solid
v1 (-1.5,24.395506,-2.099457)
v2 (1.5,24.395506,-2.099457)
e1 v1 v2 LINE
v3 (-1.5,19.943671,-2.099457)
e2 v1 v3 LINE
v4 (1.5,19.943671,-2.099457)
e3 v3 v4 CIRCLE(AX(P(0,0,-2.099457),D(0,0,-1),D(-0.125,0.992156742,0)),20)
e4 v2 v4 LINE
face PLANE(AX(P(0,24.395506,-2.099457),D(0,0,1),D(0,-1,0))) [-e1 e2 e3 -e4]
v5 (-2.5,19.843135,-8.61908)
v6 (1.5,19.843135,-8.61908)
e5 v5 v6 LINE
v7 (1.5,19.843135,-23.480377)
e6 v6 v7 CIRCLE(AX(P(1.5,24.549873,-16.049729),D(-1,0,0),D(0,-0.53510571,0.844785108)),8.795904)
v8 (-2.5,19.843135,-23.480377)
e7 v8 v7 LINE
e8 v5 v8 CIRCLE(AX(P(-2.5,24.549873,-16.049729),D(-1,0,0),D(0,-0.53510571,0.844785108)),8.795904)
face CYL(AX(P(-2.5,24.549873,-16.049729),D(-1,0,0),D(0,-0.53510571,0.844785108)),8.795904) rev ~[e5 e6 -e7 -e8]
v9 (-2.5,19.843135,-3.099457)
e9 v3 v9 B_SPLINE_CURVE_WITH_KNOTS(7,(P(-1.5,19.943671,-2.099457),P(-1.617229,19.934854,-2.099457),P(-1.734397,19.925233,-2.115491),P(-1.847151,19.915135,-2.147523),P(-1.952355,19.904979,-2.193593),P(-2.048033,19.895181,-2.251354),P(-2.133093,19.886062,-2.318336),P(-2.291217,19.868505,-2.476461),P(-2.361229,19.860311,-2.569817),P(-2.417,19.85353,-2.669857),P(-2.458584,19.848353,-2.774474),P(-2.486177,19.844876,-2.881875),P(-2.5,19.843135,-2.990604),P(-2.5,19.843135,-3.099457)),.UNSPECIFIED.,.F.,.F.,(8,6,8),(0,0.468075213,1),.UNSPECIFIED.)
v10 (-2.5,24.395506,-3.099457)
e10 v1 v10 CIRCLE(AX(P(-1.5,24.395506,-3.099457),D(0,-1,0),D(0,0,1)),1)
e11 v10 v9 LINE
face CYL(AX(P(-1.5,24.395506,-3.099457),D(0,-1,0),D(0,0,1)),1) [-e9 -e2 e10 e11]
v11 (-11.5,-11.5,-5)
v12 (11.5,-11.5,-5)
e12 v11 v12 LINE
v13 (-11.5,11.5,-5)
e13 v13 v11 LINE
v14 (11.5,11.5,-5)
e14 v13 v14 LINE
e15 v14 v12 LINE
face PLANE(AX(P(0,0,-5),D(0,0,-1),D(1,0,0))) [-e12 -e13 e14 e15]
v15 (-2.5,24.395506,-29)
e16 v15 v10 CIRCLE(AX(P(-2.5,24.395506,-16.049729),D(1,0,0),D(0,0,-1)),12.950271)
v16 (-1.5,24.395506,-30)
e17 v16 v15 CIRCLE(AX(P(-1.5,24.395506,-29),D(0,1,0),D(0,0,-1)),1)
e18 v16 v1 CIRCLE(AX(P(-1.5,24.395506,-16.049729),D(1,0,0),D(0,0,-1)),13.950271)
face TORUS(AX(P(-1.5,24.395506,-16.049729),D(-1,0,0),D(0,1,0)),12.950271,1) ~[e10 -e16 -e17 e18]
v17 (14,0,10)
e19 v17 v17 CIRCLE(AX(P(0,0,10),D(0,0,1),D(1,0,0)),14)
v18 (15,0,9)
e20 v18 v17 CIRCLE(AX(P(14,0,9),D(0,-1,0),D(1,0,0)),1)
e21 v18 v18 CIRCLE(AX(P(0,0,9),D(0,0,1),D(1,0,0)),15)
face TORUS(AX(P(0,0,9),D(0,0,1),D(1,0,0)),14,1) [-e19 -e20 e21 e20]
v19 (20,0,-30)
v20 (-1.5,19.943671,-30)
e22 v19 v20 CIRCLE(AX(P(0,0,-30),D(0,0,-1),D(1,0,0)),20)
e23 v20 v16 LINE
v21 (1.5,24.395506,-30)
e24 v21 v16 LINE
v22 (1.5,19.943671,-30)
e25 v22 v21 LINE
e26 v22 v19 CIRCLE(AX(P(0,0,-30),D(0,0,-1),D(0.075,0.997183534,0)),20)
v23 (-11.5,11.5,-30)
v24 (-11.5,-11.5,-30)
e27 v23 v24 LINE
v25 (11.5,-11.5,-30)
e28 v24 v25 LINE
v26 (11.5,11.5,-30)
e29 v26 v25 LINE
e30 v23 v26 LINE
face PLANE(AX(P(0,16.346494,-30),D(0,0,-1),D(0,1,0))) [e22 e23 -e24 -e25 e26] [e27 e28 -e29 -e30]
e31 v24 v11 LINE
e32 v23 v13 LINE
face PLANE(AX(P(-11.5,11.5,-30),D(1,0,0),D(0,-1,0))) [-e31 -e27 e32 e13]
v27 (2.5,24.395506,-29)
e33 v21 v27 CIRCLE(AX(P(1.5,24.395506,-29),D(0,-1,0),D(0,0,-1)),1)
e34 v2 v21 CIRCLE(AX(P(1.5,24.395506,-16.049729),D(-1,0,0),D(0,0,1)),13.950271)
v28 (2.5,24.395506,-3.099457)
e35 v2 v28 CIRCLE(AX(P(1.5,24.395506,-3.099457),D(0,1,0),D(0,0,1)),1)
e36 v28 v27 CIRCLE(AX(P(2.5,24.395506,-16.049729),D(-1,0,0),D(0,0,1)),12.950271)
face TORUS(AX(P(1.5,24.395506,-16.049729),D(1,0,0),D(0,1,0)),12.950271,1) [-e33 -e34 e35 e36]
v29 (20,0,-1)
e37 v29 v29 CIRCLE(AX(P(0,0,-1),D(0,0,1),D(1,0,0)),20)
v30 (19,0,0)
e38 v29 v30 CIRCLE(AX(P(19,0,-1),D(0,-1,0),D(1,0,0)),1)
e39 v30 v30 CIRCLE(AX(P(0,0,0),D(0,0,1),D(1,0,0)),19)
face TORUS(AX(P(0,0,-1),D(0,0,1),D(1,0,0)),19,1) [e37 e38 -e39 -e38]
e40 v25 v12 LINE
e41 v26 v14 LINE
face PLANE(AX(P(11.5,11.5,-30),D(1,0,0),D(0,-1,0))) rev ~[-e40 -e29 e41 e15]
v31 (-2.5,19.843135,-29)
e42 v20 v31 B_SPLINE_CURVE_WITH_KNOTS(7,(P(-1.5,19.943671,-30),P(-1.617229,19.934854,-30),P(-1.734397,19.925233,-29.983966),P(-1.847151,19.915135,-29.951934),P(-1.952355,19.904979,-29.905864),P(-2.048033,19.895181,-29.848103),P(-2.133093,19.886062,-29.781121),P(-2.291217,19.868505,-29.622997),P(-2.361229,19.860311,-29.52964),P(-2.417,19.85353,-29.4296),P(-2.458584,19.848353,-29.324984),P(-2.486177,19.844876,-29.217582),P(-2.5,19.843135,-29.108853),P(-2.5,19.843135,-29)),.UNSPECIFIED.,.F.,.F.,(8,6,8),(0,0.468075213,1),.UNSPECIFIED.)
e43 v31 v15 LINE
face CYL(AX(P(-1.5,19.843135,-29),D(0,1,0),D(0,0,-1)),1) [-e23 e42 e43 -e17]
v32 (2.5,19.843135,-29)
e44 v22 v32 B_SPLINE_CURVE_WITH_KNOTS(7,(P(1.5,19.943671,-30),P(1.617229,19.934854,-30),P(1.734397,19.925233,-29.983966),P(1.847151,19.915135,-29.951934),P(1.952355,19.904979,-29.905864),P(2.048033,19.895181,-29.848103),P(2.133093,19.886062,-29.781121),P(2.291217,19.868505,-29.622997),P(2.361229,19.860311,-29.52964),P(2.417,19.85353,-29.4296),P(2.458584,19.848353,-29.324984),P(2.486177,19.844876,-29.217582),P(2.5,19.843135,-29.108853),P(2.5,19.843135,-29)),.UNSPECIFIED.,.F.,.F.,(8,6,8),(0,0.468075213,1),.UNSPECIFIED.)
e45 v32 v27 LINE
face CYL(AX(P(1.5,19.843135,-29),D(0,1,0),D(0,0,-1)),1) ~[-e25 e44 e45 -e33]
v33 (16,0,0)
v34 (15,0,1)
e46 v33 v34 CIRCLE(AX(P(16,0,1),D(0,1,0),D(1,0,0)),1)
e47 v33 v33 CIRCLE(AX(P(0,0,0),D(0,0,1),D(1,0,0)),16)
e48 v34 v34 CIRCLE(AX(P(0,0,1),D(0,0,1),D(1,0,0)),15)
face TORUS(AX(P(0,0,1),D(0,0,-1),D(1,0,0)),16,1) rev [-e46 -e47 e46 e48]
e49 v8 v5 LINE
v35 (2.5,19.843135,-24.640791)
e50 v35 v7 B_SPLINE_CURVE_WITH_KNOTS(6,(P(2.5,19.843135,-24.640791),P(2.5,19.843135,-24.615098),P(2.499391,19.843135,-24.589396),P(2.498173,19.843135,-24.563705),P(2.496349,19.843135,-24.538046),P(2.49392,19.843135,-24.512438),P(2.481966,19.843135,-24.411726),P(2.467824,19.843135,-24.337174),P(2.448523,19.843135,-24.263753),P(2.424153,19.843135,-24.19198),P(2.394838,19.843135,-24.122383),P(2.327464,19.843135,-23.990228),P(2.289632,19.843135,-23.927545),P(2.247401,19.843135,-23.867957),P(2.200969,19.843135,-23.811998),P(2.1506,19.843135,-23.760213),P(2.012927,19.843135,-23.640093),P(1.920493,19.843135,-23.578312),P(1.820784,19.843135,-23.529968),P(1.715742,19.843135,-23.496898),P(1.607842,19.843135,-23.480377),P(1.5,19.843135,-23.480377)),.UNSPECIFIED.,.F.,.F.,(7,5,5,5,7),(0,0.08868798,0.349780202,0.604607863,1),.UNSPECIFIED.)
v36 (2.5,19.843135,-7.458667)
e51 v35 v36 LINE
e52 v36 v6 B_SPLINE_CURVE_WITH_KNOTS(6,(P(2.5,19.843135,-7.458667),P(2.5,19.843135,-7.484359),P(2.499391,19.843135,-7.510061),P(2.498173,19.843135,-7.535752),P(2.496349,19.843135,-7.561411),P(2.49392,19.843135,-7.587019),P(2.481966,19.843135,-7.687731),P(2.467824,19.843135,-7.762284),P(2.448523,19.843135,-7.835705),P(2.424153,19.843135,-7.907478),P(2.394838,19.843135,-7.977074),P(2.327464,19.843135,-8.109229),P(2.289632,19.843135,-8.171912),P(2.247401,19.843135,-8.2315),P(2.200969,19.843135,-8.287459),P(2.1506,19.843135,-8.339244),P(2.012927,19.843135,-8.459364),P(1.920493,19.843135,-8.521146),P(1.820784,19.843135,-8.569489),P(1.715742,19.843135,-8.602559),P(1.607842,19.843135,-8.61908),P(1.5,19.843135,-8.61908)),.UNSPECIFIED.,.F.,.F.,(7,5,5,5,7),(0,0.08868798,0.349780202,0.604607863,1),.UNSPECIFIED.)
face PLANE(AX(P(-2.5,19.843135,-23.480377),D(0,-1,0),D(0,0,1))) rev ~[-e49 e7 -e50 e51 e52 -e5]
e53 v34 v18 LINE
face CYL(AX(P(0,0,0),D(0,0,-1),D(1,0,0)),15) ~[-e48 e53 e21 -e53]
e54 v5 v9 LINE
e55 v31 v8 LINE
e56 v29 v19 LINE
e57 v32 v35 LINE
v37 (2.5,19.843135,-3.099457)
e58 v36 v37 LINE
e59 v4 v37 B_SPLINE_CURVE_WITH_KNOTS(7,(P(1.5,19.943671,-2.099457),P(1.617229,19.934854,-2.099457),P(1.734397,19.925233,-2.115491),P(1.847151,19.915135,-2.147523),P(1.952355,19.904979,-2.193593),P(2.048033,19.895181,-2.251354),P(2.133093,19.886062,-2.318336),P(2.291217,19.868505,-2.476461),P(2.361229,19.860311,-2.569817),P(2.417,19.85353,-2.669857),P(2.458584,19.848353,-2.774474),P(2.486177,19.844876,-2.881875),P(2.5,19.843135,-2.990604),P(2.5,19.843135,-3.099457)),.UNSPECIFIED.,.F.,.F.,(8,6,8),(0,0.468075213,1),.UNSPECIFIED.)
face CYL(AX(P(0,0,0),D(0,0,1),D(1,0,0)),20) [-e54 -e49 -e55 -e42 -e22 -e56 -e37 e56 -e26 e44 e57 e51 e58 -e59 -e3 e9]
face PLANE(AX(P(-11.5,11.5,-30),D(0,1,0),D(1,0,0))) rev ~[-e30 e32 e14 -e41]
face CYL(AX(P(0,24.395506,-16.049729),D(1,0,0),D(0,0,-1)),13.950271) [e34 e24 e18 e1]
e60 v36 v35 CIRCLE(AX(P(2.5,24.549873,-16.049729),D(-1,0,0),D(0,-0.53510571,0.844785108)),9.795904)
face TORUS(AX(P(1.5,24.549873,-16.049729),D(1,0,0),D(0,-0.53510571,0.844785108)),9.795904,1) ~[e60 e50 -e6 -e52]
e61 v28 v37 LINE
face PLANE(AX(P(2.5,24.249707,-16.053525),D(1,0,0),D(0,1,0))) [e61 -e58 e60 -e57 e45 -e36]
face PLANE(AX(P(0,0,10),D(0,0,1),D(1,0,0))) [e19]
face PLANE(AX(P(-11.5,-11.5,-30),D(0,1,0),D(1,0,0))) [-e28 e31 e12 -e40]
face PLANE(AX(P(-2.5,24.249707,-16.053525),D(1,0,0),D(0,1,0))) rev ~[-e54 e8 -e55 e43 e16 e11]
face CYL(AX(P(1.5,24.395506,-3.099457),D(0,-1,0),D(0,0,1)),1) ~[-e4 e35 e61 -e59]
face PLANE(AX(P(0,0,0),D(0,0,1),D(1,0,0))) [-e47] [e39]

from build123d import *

# Parameters (mm, degrees)
F0_R          = 15
F1_DEPTH      = 10
F2_R          = 20
F3_DEPTH      = 30
F5_DEPTH      = 2.5
F5_DEPTH_BACK = 2.5
F7_DEPTH      = 25
F8_W          = 23
F8_H          = 23
F9_DEPTH      = 25
F10_R         = 1


with BuildPart() as f1:
    # F0 (on Top) → F1 (new body)
    with BuildSketch(Plane.XY):
        Circle(F0_R)
    extrude(amount=F1_DEPTH)

    # F2 (on Top) → F3 (join)
    with BuildSketch(Plane.XY):
        Circle(F2_R)
    extrude(amount=-F3_DEPTH)

    # F4 (on Right) → F5 (join, two sides)
    with BuildSketch(Plane.YZ) as f5_sk:
        with BuildLine():
            ThreePointArc((24.3955058538, -30), (34.2598373067, -25.9140601285), (38.3457771782, -16.0497286756))
            ThreePointArc((38.3457771782, -16.0497286756), (34.2598373067, -6.1853972226), (24.3955058538, -2.0994573511))
            Line((24.3955058538, -2.0994573511), (17.0112717897, -7.5845918618))
            Line((17.0112717897, -7.5845918618), (15.4388935224, -5.3544416027))
            ThreePointArc((15.4388935224, -5.3544416027), (10.5016803992, -17.3033969985), (17.4980895184, -28.1755572213))
            Line((17.4980895184, -28.1755572213), (18.3211155236, -26.8716588616))
            Line((18.3211155236, -26.8716588616), (24.3955058538, -30))
        make_face()
        with BuildLine():
            Line((17.0112717897, -7.5845918618), (24.3955058538, -2.0994573511))
            ThreePointArc((24.3955058538, -2.0994573511), (19.6306389371, -2.9384315127), (15.4388935224, -5.3544416027))
            Line((15.4388935224, -5.3544416027), (17.0112717897, -7.5845918618))
        make_face()
        with BuildLine():
            ThreePointArc((15.4388935224, -5.3544416027), (19.6306389371, -2.9384315127), (24.3955058538, -2.0994573511))
            Line((24.3955058538, -2.0994573511), (13.1439510733, -2.0994573511))
            Line((13.1439510733, -2.0994573511), (15.4388935224, -5.3544416027))
        make_face()
        with BuildLine():
            Line((16.3464937359, -30), (24.3955058538, -30))
            ThreePointArc((24.3955058538, -30), (20.8281909127, -29.5361786954), (17.4980895184, -28.1755572213))
            Line((17.4980895184, -28.1755572213), (16.3464937359, -30))
        make_face()
        with BuildLine():
            ThreePointArc((17.4980895184, -28.1755572213), (20.8281909127, -29.5361786954), (24.3955058538, -30))
            Line((24.3955058538, -30), (18.3211155236, -26.8716588616))
            Line((18.3211155236, -26.8716588616), (17.4980895184, -28.1755572213))
        make_face()
    extrude(amount=F5_DEPTH)
    extrude(f5_sk.sketch, amount=-F5_DEPTH_BACK)

    # F6 (on face) → F7 (cut)
    with BuildSketch(Plane(origin=(-2.5, 0, 0), x_dir=(0, -1, 0), z_dir=(-1, 0, 0))):
        with BuildLine():
            Line((-19.843134833, -23.4803773318), (-19.843134833, -8.6190800193))
            ThreePointArc((-19.843134833, -8.6190800193), (-33.3457771782, -16.0497286756), (-19.843134833, -23.4803773318))
        make_face()
    extrude(amount=-F7_DEPTH, mode=Mode.SUBTRACT)

    # F8 (on face) → F9 (cut)
    with BuildSketch(Plane(origin=(0, 0, -30), x_dir=(1, 0, 0), z_dir=(0, 0, -1))):
        Rectangle(F8_W, F8_H)
    extrude(amount=-F9_DEPTH, mode=Mode.SUBTRACT)

    # F10
    f10_edges = [f1.edges().sort_by_distance(p)[0] for p in [
        (-15, 0, 10),
        (-20, 0, 0),
        (2.5, 22.11932, -2.099457),
        (-2.5, 38.345777, -16.049729),
        (2.5, 33.345777, -16.049729),
        (-15, 0, 0),
    ]]
    fillet(f10_edges, radius=F10_R)


solid = f1.part
